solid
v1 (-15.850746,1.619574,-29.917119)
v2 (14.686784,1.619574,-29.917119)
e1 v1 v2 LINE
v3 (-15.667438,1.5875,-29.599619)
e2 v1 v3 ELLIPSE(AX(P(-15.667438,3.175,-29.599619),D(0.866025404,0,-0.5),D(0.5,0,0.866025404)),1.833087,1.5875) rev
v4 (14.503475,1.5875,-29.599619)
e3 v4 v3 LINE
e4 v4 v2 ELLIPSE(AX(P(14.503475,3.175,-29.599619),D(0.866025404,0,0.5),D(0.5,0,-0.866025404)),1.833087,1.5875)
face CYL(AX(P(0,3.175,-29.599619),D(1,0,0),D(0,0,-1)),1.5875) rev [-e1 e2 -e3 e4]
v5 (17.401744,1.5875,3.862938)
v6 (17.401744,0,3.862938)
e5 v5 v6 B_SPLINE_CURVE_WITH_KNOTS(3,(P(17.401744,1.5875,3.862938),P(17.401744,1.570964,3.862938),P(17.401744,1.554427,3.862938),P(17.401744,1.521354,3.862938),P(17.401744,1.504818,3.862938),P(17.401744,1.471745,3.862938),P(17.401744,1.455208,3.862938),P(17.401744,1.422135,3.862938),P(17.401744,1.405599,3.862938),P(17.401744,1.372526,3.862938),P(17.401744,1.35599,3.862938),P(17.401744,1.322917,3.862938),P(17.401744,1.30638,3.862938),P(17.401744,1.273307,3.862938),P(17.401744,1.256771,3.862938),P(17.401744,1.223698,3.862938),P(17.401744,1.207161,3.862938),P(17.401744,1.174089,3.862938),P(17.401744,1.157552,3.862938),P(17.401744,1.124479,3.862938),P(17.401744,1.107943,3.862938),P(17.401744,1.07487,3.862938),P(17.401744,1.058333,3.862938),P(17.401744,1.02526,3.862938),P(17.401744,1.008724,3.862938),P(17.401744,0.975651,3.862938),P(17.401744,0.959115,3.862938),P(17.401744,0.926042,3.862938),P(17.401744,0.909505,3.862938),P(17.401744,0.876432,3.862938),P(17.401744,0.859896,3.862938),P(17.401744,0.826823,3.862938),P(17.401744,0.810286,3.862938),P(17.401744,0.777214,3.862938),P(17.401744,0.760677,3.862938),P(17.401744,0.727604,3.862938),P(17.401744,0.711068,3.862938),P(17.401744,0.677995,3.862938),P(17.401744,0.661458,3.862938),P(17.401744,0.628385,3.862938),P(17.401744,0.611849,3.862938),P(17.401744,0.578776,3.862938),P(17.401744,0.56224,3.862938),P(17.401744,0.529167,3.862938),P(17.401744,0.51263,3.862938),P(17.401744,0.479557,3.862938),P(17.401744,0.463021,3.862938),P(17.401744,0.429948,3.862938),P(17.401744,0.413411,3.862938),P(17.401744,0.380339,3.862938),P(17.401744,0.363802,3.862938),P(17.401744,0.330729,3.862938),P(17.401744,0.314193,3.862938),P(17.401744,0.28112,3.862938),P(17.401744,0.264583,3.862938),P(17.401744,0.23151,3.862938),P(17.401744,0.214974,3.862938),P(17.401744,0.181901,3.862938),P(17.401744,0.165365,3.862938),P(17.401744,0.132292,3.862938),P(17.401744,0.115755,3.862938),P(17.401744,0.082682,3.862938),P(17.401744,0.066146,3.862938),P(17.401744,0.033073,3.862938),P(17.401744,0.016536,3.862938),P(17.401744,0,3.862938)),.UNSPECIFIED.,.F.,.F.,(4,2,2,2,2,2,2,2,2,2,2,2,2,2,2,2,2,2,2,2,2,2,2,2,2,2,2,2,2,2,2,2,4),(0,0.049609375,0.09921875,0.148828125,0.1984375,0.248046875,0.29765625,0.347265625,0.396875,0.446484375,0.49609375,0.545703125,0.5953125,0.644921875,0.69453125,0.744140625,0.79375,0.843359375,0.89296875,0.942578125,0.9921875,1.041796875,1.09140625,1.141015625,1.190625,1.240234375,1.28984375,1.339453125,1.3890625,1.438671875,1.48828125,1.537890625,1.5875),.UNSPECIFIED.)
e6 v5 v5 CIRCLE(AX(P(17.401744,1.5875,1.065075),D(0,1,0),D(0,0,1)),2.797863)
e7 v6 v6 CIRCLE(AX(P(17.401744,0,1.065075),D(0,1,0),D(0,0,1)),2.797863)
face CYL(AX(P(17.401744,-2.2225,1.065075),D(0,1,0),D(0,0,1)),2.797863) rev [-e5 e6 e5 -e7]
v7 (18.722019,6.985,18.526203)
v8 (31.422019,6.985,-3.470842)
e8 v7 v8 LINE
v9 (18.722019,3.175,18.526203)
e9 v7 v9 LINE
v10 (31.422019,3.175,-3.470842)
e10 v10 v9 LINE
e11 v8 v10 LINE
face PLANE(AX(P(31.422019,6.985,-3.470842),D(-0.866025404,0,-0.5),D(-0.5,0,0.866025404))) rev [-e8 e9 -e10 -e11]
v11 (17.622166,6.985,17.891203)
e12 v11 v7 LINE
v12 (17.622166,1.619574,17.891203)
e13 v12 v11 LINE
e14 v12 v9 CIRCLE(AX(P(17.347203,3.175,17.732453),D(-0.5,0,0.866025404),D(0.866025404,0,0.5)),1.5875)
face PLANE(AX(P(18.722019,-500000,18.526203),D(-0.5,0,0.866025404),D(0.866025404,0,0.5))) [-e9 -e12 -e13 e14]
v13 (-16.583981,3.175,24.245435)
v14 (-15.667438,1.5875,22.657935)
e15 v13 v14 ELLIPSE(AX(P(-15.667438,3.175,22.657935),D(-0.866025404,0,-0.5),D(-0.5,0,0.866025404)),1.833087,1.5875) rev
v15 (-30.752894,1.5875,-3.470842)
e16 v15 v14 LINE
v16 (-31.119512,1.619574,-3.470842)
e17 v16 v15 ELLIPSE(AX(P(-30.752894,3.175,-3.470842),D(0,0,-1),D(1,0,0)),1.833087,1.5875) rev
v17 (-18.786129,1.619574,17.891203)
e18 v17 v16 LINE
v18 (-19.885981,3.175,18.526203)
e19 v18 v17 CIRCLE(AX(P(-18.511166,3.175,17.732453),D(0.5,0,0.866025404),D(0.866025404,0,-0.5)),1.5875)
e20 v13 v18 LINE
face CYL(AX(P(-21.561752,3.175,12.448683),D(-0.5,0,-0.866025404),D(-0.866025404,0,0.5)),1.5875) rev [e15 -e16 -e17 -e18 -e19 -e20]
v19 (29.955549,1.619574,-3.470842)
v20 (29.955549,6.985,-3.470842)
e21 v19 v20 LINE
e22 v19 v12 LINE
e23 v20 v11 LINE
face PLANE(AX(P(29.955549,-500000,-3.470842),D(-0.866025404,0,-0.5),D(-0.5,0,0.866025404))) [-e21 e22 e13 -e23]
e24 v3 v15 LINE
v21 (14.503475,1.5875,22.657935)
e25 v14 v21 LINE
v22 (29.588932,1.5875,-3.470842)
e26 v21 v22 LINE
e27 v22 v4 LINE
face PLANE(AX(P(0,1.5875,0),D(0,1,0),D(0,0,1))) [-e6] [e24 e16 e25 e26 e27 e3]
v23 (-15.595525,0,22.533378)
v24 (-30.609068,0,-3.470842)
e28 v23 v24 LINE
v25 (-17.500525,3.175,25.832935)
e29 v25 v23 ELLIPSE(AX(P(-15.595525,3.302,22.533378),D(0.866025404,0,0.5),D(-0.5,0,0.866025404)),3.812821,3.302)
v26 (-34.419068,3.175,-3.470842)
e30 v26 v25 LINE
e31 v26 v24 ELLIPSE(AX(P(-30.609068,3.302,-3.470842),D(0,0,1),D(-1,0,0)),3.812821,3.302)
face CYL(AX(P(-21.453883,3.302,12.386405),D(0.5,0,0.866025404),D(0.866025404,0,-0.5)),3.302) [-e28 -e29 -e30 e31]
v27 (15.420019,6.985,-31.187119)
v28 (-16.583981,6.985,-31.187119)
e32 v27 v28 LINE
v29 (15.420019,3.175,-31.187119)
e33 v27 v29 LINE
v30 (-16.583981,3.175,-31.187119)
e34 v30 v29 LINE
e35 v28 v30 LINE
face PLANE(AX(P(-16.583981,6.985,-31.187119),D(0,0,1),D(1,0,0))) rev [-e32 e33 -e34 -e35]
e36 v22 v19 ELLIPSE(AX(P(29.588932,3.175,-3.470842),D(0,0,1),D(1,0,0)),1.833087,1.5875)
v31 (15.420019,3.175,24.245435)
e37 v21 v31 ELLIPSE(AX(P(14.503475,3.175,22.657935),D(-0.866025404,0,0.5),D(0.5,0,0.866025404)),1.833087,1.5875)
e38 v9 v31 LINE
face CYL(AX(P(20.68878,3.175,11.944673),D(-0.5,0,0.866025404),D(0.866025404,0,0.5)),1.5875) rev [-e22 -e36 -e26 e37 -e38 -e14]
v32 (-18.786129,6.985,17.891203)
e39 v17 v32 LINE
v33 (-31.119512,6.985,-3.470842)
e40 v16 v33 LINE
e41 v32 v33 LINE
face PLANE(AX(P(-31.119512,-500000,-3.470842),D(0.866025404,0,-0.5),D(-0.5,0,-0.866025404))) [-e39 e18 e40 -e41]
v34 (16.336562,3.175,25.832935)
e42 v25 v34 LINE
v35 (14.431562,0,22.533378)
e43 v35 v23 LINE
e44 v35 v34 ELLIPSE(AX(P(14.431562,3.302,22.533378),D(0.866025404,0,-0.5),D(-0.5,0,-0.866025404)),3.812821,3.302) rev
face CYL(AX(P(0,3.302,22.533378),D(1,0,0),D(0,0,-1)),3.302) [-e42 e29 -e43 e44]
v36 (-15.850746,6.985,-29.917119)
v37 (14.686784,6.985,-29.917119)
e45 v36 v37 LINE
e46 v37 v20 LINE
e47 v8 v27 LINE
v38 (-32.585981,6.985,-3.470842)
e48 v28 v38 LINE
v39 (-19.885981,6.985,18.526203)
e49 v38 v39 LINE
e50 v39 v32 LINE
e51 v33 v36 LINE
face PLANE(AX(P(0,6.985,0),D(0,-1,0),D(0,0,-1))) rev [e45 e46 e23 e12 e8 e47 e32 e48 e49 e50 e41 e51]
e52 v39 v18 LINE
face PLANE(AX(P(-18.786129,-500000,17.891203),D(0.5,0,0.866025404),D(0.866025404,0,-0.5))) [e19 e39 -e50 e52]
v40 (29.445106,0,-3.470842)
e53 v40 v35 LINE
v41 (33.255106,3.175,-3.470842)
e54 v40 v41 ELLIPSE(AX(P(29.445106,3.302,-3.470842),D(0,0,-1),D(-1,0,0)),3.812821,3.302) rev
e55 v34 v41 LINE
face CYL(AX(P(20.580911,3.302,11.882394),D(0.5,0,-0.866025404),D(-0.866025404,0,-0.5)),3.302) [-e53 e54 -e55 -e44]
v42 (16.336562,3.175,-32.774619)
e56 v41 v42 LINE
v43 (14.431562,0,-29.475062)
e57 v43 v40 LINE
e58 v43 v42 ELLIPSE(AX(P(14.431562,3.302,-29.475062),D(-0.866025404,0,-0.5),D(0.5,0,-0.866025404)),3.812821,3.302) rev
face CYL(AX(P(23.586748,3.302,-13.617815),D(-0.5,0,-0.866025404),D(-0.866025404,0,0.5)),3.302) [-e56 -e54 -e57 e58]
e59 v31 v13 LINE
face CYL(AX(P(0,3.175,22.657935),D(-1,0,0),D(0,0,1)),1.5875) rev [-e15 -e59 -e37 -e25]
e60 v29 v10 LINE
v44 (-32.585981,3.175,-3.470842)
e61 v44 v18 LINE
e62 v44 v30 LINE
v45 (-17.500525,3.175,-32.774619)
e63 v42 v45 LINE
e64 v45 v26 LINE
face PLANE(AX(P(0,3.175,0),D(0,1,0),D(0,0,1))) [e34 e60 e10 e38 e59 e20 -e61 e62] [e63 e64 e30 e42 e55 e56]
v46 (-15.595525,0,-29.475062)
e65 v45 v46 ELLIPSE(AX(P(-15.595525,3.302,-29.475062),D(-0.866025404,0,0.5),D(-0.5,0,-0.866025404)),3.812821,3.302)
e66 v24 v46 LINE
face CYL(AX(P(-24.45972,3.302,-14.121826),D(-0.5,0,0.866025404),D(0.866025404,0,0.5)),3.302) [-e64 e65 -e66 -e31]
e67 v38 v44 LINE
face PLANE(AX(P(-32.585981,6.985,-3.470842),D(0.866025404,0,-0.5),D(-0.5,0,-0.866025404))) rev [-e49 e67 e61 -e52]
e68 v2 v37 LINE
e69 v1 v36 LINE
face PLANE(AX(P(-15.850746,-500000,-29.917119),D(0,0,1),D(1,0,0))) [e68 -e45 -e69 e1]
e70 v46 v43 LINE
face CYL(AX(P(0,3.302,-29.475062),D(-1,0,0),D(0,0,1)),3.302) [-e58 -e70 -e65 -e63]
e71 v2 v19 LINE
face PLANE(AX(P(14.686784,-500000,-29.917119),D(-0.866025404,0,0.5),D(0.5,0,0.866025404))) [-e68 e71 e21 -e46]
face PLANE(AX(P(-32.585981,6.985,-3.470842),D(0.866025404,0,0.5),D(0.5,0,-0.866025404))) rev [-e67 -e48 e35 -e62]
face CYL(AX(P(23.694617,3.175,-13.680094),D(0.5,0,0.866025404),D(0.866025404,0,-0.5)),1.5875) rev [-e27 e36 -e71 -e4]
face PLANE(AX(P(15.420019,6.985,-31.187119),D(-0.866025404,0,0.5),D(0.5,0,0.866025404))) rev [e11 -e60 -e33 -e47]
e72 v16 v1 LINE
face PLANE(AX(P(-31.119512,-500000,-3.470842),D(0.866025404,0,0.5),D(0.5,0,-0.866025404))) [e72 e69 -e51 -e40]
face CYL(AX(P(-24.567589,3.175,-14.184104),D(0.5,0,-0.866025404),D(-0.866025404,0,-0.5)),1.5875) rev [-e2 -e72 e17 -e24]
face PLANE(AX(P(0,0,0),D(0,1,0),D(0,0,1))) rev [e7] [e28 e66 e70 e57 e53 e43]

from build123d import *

# Parameters (mm, degrees)
BOSS_EXTRUDE1_DEPTH             = 1.5875
BOSS_EXTRUDE2_DEPTH             = 1.5875
FILLET2_R                       = 1.5875
FILLET3_R                       = 3.302
BOSS_EXTRUDE3_DEPTH             = 3.81
BOSS_EXTRUDE3_DIRECTION_2_REACH = 49.633
SKETCH5_R                       = 2.797863207
CUT_EXTRUDE1_DEPTH              = 3.81


# Some blends are built 0.0001 mm under size
with BuildPart() as part:
    # Sketch1 → Boss-Extrude1 (new body)
    with BuildSketch(Plane(origin=(0, 0, 0), x_dir=(1, 0, 0), z_dir=(0, 1, 0))):
        Polygon((-34.41906837, 3.470841979), (-17.500524818, -25.832935043), (16.336562287, -25.832935043), (33.255105839, 3.470841979), (16.336562287, 32.774619002), (-17.500524818, 32.774619002), align=None)
    extrude(amount=BOSS_EXTRUDE1_DEPTH)

    # Sketch2 → Boss-Extrude2 (add)
    # profile 1 of 3: a face of its own
    with BuildSketch(Plane(origin=(0, 1.5875, 0), x_dir=(1, 0, 0), z_dir=(0, 1, 0))):
        Polygon((16.336562287, 32.774619002), (-17.500524818, 32.774619002), (-34.41906837, 3.470841979), (-17.500524818, -25.832935043), (16.336562287, -25.832935043), (33.255105839, 3.470841979), align=None)
        Polygon((-32.585981265, 3.470841979), (-16.583981265, 31.187119002), (15.420018735, 31.187119002), (31.422018735, 3.470841979), (15.420018735, -24.245435043), (-16.583981265, -24.245435043), align=None, mode=Mode.SUBTRACT)
    # profile 2 of 3: a face of its own
    with BuildSketch(Plane(origin=(0, 1.5875, 0), x_dir=(1, 0, 0), z_dir=(0, 1, 0))):
        Polygon((16.336562287, 32.774619002), (-17.500524818, 32.774619002), (-34.41906837, 3.470841979), (-17.500524818, -25.832935043), (16.336562287, -25.832935043), (33.255105839, 3.470841979), align=None)
        Polygon((-32.585981265, 3.470841979), (-16.583981265, 31.187119002), (15.420018735, 31.187119002), (31.422018735, 3.470841979), (15.420018735, -24.245435043), (-16.583981265, -24.245435043), align=None, mode=Mode.SUBTRACT)
    # profile 3 of 3: a face of its own
    with BuildSketch(Plane(origin=(0, 1.5875, 0), x_dir=(1, 0, 0), z_dir=(0, 1, 0))):
        Polygon((33.255105839, 3.470841979), (16.336562287, 32.774619002), (-17.500524818, 32.774619002), (-34.41906837, 3.470841979), (-17.500524818, -25.832935043), (16.336562287, -25.832935043), align=None)
        Polygon((-16.583981265, -24.245435043), (-32.585981265, 3.470841979), (-16.583981265, 31.187119002), (15.420018735, 31.187119002), (31.422018735, 3.470841979), (15.420018735, -24.245435043), align=None, mode=Mode.SUBTRACT)
    extrude(amount=BOSS_EXTRUDE2_DEPTH)

    # Fillet2
    fillet2_edges = [part.edges().sort_by_distance(p)[0] for p in [
        (23.421018735, 1.5875, -17.328980491),
        (23.421018735, 1.5875, 10.387296532),
        (-24.584981265, 1.5875, -17.328980491),
        (-0.581981265, 1.5875, 24.245435043),
        (-24.584981265, 1.5875, 10.387296532),
        (-0.581981265, 1.5875, -31.187119002),
    ]]
    fillet(fillet2_edges, radius=FILLET2_R - 0.0001)  # a hair under: the kernel refuses the full size

    # Fillet3
    # the kernel refuses this fillet: 3.302 mm, written as the material it takes off along each edge
    with BuildSketch(Plane(origin=(-25.749416789, 0, 25.832935043), x_dir=(0, 1, 0), z_dir=(1, 0, 0)), Plane(origin=(-38.543514355, 0, -10.614591979), x_dir=(0, 1, 0), z_dir=(0.4999999999999999, 0, 0.8660254037844387)), Plane(origin=(-13.376078832, 0, -39.918369002), x_dir=(0, 1, 0), z_dir=(-0.5000000000000002, 0, 0.8660254037844386)), Plane(origin=(24.585454258, 0, -32.774619002), x_dir=(0, 1, 0), z_dir=(-1, 0, 0)), Plane(origin=(12.212116302, 0, 32.976685043), x_dir=(0, 1, 0), z_dir=(0.5000000000000001, 0, -0.8660254037844387)), Plane(origin=(37.379551825, 0, 3.672908021), x_dir=(0, 1, 0), z_dir=(-0.5, 0, -0.8660254037844387))) as fillet3_piece_1:
        with BuildLine():
            CenterArc((3.302, -3.299556788), FILLET3_R, 92.204227504, 87.795772496)
            Line((0, -3.299556788), (-0.06604, -3.299556788))
            Line((-0.06604, -3.299556788), (-0.06604, 0))
            Line((-0.06604, 0), (0, 0.06604))
            ThreePointArc((0, 0.06604), (1.5875, 0.06604), (3.17246, 0.065991136))
            Line((3.17246, 0.065991136), (3.175, 0))
        make_face()
    extrude(amount=50.334871047, mode=Mode.SUBTRACT)

    # Sketch4 → Boss-Extrude3 (add)
    with BuildSketch(Plane(origin=(0, 3.175, 0), x_dir=(1, 0, 0), z_dir=(0, 1, 0))):
        Polygon((-32.585981265, 3.470841979), (-16.583981265, 31.187119002), (15.420018735, 31.187119002), (31.422018735, 3.470841979), (18.722018735, -18.526203277), (17.622166472, -17.891203277), (29.955549051, 3.470841979), (14.686783893, 29.917119002), (-15.850746423, 29.917119002), (-31.119511582, 3.470841979), (-18.786129002, -17.891203277), (-19.885981265, -18.526203277), align=None)
    extrude(amount=BOSS_EXTRUDE3_DEPTH)

    # Sketch4 → Boss-Extrude3 direction 2 (add, up to next)
    with BuildSketch(Plane(origin=(0, 3.175, 0), x_dir=(1, 0, 0), z_dir=(0, 1, 0)), mode=Mode.PRIVATE) as boss_extrude3_direction_2_sk1:
        Polygon((-32.585981265, 3.470841979), (-16.583981265, 31.187119002), (15.420018735, 31.187119002), (31.422018735, 3.470841979), (18.722018735, -18.526203277), (17.622166472, -17.891203277), (29.955549051, 3.470841979), (14.686783893, 29.917119002), (-15.850746423, 29.917119002), (-31.119511582, 3.470841979), (-18.786129002, -17.891203277), (-19.885981265, -18.526203277), align=None)
    boss_extrude3_direction_2_tool1 = extrude(boss_extrude3_direction_2_sk1.sketch, amount=-BOSS_EXTRUDE3_DIRECTION_2_REACH, mode=Mode.PRIVATE) - part.part
    add(boss_extrude3_direction_2_tool1.solids().sort_by_distance((-23.883103, 3.175, -16.923751))[0])

    # Sketch5 → Cut-Extrude1 (cut)
    with BuildSketch(Plane(origin=(0, 1.5875, 0), x_dir=(1, 0, 0), z_dir=(0, 1, 0))):
        with Locations(Location((17.401743672, -1.065074689, 0), (0, 0, 270))):
            Circle(SKETCH5_R)
    extrude(amount=-CUT_EXTRUDE1_DEPTH, mode=Mode.SUBTRACT)


solid = part.part
